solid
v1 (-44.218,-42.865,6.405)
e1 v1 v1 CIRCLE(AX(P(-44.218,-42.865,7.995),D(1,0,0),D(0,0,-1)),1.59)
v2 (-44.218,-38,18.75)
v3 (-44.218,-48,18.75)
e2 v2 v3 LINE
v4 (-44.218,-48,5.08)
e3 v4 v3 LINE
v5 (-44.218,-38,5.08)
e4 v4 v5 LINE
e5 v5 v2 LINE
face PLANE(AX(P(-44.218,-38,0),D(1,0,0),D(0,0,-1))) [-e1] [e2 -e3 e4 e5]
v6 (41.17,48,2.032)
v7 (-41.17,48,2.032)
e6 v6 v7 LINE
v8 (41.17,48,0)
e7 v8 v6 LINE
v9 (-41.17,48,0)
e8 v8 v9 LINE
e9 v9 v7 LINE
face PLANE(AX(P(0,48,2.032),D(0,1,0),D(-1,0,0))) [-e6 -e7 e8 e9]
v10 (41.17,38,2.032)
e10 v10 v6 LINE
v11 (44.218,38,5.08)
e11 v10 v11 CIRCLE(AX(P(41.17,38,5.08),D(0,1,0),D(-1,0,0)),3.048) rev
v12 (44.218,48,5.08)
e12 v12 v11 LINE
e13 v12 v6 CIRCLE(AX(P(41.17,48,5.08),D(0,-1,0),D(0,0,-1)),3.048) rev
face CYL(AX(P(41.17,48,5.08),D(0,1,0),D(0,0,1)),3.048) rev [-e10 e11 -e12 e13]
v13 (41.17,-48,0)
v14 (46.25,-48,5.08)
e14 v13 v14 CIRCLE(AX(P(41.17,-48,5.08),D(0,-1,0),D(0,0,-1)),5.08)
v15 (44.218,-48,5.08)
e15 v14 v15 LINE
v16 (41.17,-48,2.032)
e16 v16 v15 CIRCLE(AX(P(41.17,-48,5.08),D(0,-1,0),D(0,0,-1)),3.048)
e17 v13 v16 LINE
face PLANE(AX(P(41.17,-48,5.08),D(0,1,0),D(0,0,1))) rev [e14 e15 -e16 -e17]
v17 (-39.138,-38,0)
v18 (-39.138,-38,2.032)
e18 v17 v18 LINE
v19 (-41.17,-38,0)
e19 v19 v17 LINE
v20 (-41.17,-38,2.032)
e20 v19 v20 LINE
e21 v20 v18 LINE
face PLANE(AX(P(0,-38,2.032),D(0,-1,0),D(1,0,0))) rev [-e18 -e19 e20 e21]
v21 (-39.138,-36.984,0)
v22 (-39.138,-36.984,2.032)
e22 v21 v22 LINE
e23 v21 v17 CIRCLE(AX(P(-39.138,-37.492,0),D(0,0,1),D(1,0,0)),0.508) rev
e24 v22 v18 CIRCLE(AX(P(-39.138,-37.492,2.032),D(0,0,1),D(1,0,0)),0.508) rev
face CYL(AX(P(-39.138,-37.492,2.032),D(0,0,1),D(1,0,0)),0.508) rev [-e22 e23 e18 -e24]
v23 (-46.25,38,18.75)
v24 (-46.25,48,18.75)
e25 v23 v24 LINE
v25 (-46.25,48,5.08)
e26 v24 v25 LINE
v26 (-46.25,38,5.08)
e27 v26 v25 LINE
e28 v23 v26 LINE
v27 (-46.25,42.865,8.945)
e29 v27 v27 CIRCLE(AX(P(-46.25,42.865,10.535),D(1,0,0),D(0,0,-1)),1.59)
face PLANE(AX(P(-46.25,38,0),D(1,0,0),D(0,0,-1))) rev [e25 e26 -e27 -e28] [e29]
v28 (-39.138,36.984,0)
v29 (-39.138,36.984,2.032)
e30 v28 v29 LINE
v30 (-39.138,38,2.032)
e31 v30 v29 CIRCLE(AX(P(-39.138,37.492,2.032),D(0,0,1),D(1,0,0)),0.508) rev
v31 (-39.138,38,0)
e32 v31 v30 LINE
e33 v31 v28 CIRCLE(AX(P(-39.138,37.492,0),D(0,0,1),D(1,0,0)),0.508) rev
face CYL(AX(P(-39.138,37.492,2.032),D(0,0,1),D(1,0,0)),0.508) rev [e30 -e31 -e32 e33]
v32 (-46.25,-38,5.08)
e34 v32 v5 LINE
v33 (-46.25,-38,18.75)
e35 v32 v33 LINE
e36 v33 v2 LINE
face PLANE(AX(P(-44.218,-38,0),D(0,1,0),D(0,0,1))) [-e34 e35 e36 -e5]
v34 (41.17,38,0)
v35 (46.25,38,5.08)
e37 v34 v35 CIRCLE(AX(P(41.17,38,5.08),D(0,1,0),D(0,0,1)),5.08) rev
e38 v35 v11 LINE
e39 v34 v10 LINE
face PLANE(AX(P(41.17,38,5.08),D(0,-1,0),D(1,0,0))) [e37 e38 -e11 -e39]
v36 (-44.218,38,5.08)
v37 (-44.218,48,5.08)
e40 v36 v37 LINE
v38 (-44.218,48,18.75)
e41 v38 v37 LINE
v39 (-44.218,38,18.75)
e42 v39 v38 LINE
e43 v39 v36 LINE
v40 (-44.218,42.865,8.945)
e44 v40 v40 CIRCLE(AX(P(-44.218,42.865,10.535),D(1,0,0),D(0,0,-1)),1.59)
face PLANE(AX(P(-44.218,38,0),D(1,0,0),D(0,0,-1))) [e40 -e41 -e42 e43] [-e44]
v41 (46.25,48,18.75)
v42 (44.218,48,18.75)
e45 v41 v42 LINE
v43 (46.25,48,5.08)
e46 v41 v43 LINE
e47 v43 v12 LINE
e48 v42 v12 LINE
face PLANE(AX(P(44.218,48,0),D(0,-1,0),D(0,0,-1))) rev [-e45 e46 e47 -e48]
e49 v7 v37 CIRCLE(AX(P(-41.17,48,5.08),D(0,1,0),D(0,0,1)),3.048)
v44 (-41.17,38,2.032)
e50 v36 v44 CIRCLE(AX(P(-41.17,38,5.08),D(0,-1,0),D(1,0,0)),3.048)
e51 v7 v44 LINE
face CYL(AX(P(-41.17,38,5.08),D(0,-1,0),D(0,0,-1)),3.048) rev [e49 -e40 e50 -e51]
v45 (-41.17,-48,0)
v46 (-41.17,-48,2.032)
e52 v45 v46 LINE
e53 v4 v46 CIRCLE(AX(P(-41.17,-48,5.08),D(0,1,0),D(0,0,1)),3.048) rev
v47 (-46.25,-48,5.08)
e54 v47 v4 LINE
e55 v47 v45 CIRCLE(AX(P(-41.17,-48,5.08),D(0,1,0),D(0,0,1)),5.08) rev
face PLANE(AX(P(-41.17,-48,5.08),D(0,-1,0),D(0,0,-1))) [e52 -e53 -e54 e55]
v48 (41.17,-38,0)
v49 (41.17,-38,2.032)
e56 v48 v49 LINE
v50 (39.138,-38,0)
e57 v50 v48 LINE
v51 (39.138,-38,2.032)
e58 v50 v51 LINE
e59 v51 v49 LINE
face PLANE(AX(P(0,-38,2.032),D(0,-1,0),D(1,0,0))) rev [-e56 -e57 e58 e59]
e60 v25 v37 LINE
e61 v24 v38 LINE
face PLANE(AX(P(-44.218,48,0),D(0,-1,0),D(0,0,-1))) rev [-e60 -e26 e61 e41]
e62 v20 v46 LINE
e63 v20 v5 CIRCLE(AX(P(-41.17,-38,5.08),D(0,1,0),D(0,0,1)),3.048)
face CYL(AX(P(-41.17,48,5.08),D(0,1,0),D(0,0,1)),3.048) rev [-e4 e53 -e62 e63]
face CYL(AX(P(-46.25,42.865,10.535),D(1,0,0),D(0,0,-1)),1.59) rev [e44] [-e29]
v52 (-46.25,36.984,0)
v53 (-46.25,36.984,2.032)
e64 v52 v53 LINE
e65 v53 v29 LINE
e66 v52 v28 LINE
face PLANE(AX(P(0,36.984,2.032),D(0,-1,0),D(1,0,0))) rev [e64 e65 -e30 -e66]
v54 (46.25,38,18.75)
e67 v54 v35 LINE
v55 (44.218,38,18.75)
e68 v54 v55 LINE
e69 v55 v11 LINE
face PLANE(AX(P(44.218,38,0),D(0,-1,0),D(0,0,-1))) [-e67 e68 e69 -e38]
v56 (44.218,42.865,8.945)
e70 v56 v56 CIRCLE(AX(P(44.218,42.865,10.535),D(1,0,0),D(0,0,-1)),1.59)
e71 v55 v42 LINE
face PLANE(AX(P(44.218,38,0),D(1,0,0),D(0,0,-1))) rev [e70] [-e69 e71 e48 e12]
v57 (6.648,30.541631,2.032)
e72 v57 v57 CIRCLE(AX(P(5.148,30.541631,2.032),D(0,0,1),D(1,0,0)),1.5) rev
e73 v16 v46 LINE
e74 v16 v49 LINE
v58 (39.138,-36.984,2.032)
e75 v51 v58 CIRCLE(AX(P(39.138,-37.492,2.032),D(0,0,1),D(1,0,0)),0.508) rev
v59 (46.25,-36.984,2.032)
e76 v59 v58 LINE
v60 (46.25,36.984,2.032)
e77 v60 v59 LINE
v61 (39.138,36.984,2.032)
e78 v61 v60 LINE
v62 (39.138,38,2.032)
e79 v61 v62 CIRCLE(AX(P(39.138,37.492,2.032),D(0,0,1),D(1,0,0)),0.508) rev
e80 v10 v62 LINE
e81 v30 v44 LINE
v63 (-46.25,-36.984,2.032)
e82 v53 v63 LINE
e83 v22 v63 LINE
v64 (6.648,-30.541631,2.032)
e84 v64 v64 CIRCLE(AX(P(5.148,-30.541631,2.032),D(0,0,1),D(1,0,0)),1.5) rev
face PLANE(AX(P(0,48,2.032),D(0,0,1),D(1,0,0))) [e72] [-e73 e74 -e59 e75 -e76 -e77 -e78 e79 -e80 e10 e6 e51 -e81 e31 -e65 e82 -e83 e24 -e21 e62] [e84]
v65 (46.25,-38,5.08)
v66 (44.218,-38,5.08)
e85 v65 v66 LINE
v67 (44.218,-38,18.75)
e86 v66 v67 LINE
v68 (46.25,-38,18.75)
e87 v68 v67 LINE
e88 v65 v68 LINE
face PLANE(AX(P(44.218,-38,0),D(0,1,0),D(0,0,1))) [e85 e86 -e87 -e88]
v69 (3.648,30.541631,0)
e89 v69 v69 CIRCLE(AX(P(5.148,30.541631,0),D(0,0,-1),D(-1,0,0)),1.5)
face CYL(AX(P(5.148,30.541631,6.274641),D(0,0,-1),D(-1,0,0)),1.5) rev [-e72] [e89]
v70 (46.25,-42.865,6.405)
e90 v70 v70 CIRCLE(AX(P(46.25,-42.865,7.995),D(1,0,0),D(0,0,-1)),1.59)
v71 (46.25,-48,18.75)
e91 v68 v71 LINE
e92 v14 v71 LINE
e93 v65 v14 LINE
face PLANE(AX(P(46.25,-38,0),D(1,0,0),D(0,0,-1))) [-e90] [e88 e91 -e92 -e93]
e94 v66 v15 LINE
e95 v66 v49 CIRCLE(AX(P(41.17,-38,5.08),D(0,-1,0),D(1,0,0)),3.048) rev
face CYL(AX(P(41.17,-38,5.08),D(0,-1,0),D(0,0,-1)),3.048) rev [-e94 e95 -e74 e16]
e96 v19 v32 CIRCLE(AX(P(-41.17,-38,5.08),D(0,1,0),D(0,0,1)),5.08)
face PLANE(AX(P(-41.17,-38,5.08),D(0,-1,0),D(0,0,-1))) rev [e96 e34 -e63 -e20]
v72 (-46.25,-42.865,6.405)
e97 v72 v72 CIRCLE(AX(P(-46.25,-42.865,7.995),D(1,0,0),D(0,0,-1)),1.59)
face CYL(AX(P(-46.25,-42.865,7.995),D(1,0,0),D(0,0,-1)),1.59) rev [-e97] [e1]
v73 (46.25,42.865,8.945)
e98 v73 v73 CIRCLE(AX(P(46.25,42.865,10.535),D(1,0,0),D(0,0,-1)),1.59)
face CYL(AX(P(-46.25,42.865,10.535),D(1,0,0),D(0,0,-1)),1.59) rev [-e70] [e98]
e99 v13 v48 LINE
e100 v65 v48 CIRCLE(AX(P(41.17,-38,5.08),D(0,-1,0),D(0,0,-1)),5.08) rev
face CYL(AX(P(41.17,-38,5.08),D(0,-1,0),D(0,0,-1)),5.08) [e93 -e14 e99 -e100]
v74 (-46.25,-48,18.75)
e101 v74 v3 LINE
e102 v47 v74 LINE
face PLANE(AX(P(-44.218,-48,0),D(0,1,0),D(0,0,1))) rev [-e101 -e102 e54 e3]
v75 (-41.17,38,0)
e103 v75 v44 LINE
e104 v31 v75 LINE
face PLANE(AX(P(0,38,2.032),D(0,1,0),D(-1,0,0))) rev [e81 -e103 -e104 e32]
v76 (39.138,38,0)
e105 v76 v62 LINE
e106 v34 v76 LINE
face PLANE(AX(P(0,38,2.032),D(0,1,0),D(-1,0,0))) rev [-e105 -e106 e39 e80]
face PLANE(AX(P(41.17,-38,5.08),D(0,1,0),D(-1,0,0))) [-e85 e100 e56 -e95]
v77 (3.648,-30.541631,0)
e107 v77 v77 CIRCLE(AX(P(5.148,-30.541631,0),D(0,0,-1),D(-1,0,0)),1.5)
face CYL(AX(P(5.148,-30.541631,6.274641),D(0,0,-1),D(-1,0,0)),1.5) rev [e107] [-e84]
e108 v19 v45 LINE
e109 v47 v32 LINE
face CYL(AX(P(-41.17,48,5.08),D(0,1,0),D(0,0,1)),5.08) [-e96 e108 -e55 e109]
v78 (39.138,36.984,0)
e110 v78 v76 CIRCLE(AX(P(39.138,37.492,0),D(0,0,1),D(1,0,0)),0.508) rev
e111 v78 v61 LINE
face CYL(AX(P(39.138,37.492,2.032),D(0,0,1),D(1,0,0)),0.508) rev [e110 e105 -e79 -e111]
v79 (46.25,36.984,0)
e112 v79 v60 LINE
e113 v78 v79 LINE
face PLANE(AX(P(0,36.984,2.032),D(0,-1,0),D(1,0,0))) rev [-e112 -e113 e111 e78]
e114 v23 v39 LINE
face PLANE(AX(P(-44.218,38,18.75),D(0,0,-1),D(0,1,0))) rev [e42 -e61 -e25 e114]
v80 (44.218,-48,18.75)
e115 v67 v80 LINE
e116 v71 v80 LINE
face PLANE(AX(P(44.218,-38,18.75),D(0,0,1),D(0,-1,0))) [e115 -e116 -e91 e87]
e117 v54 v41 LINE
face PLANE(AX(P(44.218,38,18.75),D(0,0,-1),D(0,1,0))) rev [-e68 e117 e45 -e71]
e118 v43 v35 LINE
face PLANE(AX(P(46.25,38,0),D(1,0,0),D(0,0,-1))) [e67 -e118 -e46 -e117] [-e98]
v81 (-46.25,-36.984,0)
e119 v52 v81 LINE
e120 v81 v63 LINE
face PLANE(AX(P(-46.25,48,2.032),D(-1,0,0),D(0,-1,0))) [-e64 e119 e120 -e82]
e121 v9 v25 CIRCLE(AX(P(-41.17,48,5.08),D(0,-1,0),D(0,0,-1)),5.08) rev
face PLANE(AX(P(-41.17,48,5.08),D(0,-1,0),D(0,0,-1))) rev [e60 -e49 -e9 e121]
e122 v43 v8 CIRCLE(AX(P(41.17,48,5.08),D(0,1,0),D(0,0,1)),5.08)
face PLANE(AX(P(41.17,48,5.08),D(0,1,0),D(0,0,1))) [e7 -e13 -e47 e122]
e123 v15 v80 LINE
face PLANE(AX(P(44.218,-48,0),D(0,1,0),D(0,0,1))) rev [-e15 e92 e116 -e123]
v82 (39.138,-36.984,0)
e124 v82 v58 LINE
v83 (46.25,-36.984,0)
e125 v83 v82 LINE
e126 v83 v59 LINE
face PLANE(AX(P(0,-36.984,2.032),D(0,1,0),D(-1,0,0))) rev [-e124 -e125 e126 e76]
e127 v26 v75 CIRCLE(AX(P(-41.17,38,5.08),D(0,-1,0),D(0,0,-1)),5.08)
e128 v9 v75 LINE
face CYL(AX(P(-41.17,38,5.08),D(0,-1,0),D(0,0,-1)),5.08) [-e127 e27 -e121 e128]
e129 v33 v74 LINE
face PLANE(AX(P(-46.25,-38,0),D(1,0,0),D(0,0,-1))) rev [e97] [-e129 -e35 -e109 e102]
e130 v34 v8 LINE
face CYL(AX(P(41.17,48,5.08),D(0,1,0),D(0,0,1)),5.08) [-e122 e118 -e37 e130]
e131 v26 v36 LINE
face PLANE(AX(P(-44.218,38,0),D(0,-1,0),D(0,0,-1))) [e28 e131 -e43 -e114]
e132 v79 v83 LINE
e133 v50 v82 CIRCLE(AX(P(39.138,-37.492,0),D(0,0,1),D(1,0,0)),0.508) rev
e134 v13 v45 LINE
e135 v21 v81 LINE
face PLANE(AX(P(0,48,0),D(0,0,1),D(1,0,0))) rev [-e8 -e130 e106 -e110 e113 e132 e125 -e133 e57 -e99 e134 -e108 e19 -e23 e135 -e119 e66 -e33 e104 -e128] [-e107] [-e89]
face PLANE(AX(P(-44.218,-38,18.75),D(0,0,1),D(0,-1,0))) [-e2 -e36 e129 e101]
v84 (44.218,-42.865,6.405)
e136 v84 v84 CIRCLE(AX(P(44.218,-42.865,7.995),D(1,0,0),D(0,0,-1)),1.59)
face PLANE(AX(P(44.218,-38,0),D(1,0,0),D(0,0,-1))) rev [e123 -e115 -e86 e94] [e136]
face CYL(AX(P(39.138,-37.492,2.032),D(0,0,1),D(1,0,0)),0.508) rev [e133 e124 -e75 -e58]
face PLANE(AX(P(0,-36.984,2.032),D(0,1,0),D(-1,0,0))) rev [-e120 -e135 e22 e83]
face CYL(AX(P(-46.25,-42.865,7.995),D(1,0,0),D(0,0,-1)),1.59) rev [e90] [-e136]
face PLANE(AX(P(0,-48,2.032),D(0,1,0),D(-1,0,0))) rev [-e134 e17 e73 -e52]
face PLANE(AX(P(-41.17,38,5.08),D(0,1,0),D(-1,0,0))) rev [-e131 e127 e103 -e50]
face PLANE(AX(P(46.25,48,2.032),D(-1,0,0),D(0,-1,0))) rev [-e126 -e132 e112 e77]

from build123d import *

# Parameters (mm, degrees)
BOSS_EXTRUDE1_DEPTH     = 48
BOSS_EXTRUDE2_START     = 48
BOSS_EXTRUDE2_DEPTH     = 10
BOSS_EXTRUDE3_START     = -48
BOSS_EXTRUDE3_DEPTH     = 10
CONVERT_SOLID1_START    = -48
CONVERT_SOLID1_DEPTH    = 10
CONVERT_SOLID1_START_2  = 38
CONVERT_SOLID1_2_DEPTH  = 10
CONVERT_SOLID1_3_DEPTH  = 2.032
CONVERT_SOLID1_4_DEPTH  = 11.016
CONVERT_SOLID1_START_3  = 36.984
CONVERT_SOLID1_5_DEPTH  = 11.016
CUT_EXTRUDE1_DEPTH      = 70.243230716
CUT_EXTRUDE1_DEPTH_BACK = 70.243230716
SKETCH6_R               = 1.59
SKETCH7_R               = 1.5
CUT_EXTRUDE3_DEPTH      = 2.032


# Read off the part's stored shape, not the designer's step: Convert-Solid1
with BuildPart() as part:
    # Sketch1 → Boss-Extrude1 (new, symmetric)
    with BuildSketch(Plane(origin=(0, 0, 0), x_dir=(1, 0, 0), z_dir=(0, 1, 0))):
        Polygon((-44.218, 0), (-46.25, 0), (-46.25, -2.032), (-44.218, -2.032), (44.218, -2.032), (46.25, -2.032), (46.25, 0), (44.218, 0), align=None)
    extrude(amount=BOSS_EXTRUDE1_DEPTH, both=True)

    # Sketch1<3> → Boss-Extrude2 (add)
    with BuildSketch(Plane(origin=(0, 0, 0), x_dir=(1, 0, 0), z_dir=(0, 1, 0)).offset(BOSS_EXTRUDE2_START)):
        Polygon((-46.25, 0), (46.25, 0), (46.25, -18.75), (44.218, -18.75), (44.218, -2.032), (-44.218, -2.032), (-44.218, -18.75), (-46.25, -18.75), align=None)
    extrude(amount=-BOSS_EXTRUDE2_DEPTH)

    # Sketch1<4> → Boss-Extrude3 (add)
    with BuildSketch(Plane(origin=(0, 0, 0), x_dir=(1, 0, 0), z_dir=(0, 1, 0)).offset(BOSS_EXTRUDE3_START)):
        Polygon((-46.25, 0), (46.25, 0), (46.25, -18.75), (44.218, -18.75), (44.218, -2.032), (-44.218, -2.032), (-44.218, -18.75), (-46.25, -18.75), align=None)
    extrude(amount=BOSS_EXTRUDE3_DEPTH)

    # Convert-Solid1 outline → Convert-Solid1 (add)
    with BuildSketch(Plane(origin=(0, 0, 0), x_dir=(1, 0, 0), z_dir=(0, 1, 0)).offset(CONVERT_SOLID1_START)):
        with BuildLine():
            ThreePointArc((41.17, -2.032), (43.325261469, -2.924738531), (44.218, -5.08))
            Line((44.218, -5.08), (44.218, -2.032))
            Line((44.218, -2.032), (41.17, -2.032))
        make_face()
        with BuildLine():
            ThreePointArc((-44.218, -5.08), (-43.325261469, -2.924738531), (-41.17, -2.032))
            Line((-41.17, -2.032), (-44.218, -2.032))
            Line((-44.218, -2.032), (-44.218, -5.08))
        make_face()
    extrude(amount=CONVERT_SOLID1_DEPTH)

    # Convert-Solid1 2 outline → Convert-Solid1 2 (add)
    with BuildSketch(Plane(origin=(0, 0, 0), x_dir=(1, 0, 0), z_dir=(0, 1, 0)).offset(CONVERT_SOLID1_START_2)):
        with BuildLine():
            ThreePointArc((41.17, -2.032), (43.325261469, -2.924738531), (44.218, -5.08))
            Line((44.218, -5.08), (44.218, -2.032))
            Line((44.218, -2.032), (41.17, -2.032))
        make_face()
        with BuildLine():
            ThreePointArc((-44.218, -5.08), (-43.325261469, -2.924738531), (-41.17, -2.032))
            Line((-41.17, -2.032), (-44.218, -2.032))
            Line((-44.218, -2.032), (-44.218, -5.08))
        make_face()
    extrude(amount=CONVERT_SOLID1_2_DEPTH)

    # Convert-Solid1 3 outline → Convert-Solid1 3 (cut)
    with BuildSketch(Plane.XY):
        with BuildLine():
            ThreePointArc((39.138, -36.984), (38.63, -37.492), (39.138, -38))
            Line((39.138, -38), (46.25, -38))
            Line((46.25, -38), (46.25, -36.984))
            Line((46.25, -36.984), (39.138, -36.984))
        make_face()
        with BuildLine():
            Line((39.138, 36.984), (46.25, 36.984))
            Line((46.25, 36.984), (46.25, 38))
            Line((46.25, 38), (39.138, 38))
            ThreePointArc((39.138, 38), (38.63, 37.492), (39.138, 36.984))
        make_face()
        with BuildLine():
            Line((-46.25, -36.984), (-46.25, -38))
            Line((-46.25, -38), (-39.138, -38))
            ThreePointArc((-39.138, -38), (-38.63, -37.492), (-39.138, -36.984))
            Line((-39.138, -36.984), (-46.25, -36.984))
        make_face()
        with BuildLine():
            Line((-39.138, 38), (-46.25, 38))
            Line((-46.25, 38), (-46.25, 36.984))
            Line((-46.25, 36.984), (-39.138, 36.984))
            ThreePointArc((-39.138, 36.984), (-38.63, 37.492), (-39.138, 38))
        make_face()
    extrude(amount=CONVERT_SOLID1_3_DEPTH, mode=Mode.SUBTRACT)

    # Convert-Solid1 4 outline → Convert-Solid1 4 (cut)
    with BuildSketch(Plane(origin=(0, 0, 0), x_dir=(1, 0, 0), z_dir=(0, 1, 0)).offset(CONVERT_SOLID1_START)):
        with BuildLine():
            Line((46.25, -5.08), (46.25, 0))
            Line((46.25, 0), (41.17, 0))
            ThreePointArc((41.17, 0), (44.762102448, -1.487897552), (46.25, -5.08))
        make_face()
        with BuildLine():
            Line((-46.25, 0), (-46.25, -5.08))
            ThreePointArc((-46.25, -5.08), (-44.762102448, -1.487897552), (-41.17, 0))
            Line((-41.17, 0), (-46.25, 0))
        make_face()
    extrude(amount=CONVERT_SOLID1_4_DEPTH, mode=Mode.SUBTRACT)

    # Convert-Solid1 5 outline → Convert-Solid1 5 (cut)
    with BuildSketch(Plane(origin=(0, 0, 0), x_dir=(1, 0, 0), z_dir=(0, 1, 0)).offset(CONVERT_SOLID1_START_3)):
        with BuildLine():
            Line((46.25, -5.08), (46.25, 0))
            Line((46.25, 0), (41.17, 0))
            ThreePointArc((41.17, 0), (44.762102448, -1.487897552), (46.25, -5.08))
        make_face()
        with BuildLine():
            Line((-46.25, 0), (-46.25, -5.08))
            ThreePointArc((-46.25, -5.08), (-44.762102448, -1.487897552), (-41.17, 0))
            Line((-41.17, 0), (-46.25, 0))
        make_face()
    extrude(amount=CONVERT_SOLID1_5_DEPTH, mode=Mode.SUBTRACT)

    # Sketch6 → Cut-Extrude1 (cut, two sides: drawn at the far end of the back side and taken through both)
    with BuildSketch(Plane(origin=(0, 0, 0), x_dir=(0, 0, -1), z_dir=(1, 0, 0)).offset(-CUT_EXTRUDE1_DEPTH_BACK)):
        with Locations((-10.535, 42.865)):
            Circle(SKETCH6_R)
        with Locations((-7.995, -42.865)):
            Circle(SKETCH6_R)
    extrude(amount=CUT_EXTRUDE1_DEPTH + CUT_EXTRUDE1_DEPTH_BACK, mode=Mode.SUBTRACT)

    # Sketch7 → Cut-Extrude3 (cut)
    with BuildSketch(Plane(origin=(0, 0, 0), x_dir=(-1, 0, 0), z_dir=(0, 0, -1))):
        with Locations((-5.148, 30.54163056)):
            Circle(SKETCH7_R)
        with Locations((-5.148, -30.54163056)):
            Circle(SKETCH7_R)
    extrude(amount=-CUT_EXTRUDE3_DEPTH, mode=Mode.SUBTRACT)


solid = part.part
